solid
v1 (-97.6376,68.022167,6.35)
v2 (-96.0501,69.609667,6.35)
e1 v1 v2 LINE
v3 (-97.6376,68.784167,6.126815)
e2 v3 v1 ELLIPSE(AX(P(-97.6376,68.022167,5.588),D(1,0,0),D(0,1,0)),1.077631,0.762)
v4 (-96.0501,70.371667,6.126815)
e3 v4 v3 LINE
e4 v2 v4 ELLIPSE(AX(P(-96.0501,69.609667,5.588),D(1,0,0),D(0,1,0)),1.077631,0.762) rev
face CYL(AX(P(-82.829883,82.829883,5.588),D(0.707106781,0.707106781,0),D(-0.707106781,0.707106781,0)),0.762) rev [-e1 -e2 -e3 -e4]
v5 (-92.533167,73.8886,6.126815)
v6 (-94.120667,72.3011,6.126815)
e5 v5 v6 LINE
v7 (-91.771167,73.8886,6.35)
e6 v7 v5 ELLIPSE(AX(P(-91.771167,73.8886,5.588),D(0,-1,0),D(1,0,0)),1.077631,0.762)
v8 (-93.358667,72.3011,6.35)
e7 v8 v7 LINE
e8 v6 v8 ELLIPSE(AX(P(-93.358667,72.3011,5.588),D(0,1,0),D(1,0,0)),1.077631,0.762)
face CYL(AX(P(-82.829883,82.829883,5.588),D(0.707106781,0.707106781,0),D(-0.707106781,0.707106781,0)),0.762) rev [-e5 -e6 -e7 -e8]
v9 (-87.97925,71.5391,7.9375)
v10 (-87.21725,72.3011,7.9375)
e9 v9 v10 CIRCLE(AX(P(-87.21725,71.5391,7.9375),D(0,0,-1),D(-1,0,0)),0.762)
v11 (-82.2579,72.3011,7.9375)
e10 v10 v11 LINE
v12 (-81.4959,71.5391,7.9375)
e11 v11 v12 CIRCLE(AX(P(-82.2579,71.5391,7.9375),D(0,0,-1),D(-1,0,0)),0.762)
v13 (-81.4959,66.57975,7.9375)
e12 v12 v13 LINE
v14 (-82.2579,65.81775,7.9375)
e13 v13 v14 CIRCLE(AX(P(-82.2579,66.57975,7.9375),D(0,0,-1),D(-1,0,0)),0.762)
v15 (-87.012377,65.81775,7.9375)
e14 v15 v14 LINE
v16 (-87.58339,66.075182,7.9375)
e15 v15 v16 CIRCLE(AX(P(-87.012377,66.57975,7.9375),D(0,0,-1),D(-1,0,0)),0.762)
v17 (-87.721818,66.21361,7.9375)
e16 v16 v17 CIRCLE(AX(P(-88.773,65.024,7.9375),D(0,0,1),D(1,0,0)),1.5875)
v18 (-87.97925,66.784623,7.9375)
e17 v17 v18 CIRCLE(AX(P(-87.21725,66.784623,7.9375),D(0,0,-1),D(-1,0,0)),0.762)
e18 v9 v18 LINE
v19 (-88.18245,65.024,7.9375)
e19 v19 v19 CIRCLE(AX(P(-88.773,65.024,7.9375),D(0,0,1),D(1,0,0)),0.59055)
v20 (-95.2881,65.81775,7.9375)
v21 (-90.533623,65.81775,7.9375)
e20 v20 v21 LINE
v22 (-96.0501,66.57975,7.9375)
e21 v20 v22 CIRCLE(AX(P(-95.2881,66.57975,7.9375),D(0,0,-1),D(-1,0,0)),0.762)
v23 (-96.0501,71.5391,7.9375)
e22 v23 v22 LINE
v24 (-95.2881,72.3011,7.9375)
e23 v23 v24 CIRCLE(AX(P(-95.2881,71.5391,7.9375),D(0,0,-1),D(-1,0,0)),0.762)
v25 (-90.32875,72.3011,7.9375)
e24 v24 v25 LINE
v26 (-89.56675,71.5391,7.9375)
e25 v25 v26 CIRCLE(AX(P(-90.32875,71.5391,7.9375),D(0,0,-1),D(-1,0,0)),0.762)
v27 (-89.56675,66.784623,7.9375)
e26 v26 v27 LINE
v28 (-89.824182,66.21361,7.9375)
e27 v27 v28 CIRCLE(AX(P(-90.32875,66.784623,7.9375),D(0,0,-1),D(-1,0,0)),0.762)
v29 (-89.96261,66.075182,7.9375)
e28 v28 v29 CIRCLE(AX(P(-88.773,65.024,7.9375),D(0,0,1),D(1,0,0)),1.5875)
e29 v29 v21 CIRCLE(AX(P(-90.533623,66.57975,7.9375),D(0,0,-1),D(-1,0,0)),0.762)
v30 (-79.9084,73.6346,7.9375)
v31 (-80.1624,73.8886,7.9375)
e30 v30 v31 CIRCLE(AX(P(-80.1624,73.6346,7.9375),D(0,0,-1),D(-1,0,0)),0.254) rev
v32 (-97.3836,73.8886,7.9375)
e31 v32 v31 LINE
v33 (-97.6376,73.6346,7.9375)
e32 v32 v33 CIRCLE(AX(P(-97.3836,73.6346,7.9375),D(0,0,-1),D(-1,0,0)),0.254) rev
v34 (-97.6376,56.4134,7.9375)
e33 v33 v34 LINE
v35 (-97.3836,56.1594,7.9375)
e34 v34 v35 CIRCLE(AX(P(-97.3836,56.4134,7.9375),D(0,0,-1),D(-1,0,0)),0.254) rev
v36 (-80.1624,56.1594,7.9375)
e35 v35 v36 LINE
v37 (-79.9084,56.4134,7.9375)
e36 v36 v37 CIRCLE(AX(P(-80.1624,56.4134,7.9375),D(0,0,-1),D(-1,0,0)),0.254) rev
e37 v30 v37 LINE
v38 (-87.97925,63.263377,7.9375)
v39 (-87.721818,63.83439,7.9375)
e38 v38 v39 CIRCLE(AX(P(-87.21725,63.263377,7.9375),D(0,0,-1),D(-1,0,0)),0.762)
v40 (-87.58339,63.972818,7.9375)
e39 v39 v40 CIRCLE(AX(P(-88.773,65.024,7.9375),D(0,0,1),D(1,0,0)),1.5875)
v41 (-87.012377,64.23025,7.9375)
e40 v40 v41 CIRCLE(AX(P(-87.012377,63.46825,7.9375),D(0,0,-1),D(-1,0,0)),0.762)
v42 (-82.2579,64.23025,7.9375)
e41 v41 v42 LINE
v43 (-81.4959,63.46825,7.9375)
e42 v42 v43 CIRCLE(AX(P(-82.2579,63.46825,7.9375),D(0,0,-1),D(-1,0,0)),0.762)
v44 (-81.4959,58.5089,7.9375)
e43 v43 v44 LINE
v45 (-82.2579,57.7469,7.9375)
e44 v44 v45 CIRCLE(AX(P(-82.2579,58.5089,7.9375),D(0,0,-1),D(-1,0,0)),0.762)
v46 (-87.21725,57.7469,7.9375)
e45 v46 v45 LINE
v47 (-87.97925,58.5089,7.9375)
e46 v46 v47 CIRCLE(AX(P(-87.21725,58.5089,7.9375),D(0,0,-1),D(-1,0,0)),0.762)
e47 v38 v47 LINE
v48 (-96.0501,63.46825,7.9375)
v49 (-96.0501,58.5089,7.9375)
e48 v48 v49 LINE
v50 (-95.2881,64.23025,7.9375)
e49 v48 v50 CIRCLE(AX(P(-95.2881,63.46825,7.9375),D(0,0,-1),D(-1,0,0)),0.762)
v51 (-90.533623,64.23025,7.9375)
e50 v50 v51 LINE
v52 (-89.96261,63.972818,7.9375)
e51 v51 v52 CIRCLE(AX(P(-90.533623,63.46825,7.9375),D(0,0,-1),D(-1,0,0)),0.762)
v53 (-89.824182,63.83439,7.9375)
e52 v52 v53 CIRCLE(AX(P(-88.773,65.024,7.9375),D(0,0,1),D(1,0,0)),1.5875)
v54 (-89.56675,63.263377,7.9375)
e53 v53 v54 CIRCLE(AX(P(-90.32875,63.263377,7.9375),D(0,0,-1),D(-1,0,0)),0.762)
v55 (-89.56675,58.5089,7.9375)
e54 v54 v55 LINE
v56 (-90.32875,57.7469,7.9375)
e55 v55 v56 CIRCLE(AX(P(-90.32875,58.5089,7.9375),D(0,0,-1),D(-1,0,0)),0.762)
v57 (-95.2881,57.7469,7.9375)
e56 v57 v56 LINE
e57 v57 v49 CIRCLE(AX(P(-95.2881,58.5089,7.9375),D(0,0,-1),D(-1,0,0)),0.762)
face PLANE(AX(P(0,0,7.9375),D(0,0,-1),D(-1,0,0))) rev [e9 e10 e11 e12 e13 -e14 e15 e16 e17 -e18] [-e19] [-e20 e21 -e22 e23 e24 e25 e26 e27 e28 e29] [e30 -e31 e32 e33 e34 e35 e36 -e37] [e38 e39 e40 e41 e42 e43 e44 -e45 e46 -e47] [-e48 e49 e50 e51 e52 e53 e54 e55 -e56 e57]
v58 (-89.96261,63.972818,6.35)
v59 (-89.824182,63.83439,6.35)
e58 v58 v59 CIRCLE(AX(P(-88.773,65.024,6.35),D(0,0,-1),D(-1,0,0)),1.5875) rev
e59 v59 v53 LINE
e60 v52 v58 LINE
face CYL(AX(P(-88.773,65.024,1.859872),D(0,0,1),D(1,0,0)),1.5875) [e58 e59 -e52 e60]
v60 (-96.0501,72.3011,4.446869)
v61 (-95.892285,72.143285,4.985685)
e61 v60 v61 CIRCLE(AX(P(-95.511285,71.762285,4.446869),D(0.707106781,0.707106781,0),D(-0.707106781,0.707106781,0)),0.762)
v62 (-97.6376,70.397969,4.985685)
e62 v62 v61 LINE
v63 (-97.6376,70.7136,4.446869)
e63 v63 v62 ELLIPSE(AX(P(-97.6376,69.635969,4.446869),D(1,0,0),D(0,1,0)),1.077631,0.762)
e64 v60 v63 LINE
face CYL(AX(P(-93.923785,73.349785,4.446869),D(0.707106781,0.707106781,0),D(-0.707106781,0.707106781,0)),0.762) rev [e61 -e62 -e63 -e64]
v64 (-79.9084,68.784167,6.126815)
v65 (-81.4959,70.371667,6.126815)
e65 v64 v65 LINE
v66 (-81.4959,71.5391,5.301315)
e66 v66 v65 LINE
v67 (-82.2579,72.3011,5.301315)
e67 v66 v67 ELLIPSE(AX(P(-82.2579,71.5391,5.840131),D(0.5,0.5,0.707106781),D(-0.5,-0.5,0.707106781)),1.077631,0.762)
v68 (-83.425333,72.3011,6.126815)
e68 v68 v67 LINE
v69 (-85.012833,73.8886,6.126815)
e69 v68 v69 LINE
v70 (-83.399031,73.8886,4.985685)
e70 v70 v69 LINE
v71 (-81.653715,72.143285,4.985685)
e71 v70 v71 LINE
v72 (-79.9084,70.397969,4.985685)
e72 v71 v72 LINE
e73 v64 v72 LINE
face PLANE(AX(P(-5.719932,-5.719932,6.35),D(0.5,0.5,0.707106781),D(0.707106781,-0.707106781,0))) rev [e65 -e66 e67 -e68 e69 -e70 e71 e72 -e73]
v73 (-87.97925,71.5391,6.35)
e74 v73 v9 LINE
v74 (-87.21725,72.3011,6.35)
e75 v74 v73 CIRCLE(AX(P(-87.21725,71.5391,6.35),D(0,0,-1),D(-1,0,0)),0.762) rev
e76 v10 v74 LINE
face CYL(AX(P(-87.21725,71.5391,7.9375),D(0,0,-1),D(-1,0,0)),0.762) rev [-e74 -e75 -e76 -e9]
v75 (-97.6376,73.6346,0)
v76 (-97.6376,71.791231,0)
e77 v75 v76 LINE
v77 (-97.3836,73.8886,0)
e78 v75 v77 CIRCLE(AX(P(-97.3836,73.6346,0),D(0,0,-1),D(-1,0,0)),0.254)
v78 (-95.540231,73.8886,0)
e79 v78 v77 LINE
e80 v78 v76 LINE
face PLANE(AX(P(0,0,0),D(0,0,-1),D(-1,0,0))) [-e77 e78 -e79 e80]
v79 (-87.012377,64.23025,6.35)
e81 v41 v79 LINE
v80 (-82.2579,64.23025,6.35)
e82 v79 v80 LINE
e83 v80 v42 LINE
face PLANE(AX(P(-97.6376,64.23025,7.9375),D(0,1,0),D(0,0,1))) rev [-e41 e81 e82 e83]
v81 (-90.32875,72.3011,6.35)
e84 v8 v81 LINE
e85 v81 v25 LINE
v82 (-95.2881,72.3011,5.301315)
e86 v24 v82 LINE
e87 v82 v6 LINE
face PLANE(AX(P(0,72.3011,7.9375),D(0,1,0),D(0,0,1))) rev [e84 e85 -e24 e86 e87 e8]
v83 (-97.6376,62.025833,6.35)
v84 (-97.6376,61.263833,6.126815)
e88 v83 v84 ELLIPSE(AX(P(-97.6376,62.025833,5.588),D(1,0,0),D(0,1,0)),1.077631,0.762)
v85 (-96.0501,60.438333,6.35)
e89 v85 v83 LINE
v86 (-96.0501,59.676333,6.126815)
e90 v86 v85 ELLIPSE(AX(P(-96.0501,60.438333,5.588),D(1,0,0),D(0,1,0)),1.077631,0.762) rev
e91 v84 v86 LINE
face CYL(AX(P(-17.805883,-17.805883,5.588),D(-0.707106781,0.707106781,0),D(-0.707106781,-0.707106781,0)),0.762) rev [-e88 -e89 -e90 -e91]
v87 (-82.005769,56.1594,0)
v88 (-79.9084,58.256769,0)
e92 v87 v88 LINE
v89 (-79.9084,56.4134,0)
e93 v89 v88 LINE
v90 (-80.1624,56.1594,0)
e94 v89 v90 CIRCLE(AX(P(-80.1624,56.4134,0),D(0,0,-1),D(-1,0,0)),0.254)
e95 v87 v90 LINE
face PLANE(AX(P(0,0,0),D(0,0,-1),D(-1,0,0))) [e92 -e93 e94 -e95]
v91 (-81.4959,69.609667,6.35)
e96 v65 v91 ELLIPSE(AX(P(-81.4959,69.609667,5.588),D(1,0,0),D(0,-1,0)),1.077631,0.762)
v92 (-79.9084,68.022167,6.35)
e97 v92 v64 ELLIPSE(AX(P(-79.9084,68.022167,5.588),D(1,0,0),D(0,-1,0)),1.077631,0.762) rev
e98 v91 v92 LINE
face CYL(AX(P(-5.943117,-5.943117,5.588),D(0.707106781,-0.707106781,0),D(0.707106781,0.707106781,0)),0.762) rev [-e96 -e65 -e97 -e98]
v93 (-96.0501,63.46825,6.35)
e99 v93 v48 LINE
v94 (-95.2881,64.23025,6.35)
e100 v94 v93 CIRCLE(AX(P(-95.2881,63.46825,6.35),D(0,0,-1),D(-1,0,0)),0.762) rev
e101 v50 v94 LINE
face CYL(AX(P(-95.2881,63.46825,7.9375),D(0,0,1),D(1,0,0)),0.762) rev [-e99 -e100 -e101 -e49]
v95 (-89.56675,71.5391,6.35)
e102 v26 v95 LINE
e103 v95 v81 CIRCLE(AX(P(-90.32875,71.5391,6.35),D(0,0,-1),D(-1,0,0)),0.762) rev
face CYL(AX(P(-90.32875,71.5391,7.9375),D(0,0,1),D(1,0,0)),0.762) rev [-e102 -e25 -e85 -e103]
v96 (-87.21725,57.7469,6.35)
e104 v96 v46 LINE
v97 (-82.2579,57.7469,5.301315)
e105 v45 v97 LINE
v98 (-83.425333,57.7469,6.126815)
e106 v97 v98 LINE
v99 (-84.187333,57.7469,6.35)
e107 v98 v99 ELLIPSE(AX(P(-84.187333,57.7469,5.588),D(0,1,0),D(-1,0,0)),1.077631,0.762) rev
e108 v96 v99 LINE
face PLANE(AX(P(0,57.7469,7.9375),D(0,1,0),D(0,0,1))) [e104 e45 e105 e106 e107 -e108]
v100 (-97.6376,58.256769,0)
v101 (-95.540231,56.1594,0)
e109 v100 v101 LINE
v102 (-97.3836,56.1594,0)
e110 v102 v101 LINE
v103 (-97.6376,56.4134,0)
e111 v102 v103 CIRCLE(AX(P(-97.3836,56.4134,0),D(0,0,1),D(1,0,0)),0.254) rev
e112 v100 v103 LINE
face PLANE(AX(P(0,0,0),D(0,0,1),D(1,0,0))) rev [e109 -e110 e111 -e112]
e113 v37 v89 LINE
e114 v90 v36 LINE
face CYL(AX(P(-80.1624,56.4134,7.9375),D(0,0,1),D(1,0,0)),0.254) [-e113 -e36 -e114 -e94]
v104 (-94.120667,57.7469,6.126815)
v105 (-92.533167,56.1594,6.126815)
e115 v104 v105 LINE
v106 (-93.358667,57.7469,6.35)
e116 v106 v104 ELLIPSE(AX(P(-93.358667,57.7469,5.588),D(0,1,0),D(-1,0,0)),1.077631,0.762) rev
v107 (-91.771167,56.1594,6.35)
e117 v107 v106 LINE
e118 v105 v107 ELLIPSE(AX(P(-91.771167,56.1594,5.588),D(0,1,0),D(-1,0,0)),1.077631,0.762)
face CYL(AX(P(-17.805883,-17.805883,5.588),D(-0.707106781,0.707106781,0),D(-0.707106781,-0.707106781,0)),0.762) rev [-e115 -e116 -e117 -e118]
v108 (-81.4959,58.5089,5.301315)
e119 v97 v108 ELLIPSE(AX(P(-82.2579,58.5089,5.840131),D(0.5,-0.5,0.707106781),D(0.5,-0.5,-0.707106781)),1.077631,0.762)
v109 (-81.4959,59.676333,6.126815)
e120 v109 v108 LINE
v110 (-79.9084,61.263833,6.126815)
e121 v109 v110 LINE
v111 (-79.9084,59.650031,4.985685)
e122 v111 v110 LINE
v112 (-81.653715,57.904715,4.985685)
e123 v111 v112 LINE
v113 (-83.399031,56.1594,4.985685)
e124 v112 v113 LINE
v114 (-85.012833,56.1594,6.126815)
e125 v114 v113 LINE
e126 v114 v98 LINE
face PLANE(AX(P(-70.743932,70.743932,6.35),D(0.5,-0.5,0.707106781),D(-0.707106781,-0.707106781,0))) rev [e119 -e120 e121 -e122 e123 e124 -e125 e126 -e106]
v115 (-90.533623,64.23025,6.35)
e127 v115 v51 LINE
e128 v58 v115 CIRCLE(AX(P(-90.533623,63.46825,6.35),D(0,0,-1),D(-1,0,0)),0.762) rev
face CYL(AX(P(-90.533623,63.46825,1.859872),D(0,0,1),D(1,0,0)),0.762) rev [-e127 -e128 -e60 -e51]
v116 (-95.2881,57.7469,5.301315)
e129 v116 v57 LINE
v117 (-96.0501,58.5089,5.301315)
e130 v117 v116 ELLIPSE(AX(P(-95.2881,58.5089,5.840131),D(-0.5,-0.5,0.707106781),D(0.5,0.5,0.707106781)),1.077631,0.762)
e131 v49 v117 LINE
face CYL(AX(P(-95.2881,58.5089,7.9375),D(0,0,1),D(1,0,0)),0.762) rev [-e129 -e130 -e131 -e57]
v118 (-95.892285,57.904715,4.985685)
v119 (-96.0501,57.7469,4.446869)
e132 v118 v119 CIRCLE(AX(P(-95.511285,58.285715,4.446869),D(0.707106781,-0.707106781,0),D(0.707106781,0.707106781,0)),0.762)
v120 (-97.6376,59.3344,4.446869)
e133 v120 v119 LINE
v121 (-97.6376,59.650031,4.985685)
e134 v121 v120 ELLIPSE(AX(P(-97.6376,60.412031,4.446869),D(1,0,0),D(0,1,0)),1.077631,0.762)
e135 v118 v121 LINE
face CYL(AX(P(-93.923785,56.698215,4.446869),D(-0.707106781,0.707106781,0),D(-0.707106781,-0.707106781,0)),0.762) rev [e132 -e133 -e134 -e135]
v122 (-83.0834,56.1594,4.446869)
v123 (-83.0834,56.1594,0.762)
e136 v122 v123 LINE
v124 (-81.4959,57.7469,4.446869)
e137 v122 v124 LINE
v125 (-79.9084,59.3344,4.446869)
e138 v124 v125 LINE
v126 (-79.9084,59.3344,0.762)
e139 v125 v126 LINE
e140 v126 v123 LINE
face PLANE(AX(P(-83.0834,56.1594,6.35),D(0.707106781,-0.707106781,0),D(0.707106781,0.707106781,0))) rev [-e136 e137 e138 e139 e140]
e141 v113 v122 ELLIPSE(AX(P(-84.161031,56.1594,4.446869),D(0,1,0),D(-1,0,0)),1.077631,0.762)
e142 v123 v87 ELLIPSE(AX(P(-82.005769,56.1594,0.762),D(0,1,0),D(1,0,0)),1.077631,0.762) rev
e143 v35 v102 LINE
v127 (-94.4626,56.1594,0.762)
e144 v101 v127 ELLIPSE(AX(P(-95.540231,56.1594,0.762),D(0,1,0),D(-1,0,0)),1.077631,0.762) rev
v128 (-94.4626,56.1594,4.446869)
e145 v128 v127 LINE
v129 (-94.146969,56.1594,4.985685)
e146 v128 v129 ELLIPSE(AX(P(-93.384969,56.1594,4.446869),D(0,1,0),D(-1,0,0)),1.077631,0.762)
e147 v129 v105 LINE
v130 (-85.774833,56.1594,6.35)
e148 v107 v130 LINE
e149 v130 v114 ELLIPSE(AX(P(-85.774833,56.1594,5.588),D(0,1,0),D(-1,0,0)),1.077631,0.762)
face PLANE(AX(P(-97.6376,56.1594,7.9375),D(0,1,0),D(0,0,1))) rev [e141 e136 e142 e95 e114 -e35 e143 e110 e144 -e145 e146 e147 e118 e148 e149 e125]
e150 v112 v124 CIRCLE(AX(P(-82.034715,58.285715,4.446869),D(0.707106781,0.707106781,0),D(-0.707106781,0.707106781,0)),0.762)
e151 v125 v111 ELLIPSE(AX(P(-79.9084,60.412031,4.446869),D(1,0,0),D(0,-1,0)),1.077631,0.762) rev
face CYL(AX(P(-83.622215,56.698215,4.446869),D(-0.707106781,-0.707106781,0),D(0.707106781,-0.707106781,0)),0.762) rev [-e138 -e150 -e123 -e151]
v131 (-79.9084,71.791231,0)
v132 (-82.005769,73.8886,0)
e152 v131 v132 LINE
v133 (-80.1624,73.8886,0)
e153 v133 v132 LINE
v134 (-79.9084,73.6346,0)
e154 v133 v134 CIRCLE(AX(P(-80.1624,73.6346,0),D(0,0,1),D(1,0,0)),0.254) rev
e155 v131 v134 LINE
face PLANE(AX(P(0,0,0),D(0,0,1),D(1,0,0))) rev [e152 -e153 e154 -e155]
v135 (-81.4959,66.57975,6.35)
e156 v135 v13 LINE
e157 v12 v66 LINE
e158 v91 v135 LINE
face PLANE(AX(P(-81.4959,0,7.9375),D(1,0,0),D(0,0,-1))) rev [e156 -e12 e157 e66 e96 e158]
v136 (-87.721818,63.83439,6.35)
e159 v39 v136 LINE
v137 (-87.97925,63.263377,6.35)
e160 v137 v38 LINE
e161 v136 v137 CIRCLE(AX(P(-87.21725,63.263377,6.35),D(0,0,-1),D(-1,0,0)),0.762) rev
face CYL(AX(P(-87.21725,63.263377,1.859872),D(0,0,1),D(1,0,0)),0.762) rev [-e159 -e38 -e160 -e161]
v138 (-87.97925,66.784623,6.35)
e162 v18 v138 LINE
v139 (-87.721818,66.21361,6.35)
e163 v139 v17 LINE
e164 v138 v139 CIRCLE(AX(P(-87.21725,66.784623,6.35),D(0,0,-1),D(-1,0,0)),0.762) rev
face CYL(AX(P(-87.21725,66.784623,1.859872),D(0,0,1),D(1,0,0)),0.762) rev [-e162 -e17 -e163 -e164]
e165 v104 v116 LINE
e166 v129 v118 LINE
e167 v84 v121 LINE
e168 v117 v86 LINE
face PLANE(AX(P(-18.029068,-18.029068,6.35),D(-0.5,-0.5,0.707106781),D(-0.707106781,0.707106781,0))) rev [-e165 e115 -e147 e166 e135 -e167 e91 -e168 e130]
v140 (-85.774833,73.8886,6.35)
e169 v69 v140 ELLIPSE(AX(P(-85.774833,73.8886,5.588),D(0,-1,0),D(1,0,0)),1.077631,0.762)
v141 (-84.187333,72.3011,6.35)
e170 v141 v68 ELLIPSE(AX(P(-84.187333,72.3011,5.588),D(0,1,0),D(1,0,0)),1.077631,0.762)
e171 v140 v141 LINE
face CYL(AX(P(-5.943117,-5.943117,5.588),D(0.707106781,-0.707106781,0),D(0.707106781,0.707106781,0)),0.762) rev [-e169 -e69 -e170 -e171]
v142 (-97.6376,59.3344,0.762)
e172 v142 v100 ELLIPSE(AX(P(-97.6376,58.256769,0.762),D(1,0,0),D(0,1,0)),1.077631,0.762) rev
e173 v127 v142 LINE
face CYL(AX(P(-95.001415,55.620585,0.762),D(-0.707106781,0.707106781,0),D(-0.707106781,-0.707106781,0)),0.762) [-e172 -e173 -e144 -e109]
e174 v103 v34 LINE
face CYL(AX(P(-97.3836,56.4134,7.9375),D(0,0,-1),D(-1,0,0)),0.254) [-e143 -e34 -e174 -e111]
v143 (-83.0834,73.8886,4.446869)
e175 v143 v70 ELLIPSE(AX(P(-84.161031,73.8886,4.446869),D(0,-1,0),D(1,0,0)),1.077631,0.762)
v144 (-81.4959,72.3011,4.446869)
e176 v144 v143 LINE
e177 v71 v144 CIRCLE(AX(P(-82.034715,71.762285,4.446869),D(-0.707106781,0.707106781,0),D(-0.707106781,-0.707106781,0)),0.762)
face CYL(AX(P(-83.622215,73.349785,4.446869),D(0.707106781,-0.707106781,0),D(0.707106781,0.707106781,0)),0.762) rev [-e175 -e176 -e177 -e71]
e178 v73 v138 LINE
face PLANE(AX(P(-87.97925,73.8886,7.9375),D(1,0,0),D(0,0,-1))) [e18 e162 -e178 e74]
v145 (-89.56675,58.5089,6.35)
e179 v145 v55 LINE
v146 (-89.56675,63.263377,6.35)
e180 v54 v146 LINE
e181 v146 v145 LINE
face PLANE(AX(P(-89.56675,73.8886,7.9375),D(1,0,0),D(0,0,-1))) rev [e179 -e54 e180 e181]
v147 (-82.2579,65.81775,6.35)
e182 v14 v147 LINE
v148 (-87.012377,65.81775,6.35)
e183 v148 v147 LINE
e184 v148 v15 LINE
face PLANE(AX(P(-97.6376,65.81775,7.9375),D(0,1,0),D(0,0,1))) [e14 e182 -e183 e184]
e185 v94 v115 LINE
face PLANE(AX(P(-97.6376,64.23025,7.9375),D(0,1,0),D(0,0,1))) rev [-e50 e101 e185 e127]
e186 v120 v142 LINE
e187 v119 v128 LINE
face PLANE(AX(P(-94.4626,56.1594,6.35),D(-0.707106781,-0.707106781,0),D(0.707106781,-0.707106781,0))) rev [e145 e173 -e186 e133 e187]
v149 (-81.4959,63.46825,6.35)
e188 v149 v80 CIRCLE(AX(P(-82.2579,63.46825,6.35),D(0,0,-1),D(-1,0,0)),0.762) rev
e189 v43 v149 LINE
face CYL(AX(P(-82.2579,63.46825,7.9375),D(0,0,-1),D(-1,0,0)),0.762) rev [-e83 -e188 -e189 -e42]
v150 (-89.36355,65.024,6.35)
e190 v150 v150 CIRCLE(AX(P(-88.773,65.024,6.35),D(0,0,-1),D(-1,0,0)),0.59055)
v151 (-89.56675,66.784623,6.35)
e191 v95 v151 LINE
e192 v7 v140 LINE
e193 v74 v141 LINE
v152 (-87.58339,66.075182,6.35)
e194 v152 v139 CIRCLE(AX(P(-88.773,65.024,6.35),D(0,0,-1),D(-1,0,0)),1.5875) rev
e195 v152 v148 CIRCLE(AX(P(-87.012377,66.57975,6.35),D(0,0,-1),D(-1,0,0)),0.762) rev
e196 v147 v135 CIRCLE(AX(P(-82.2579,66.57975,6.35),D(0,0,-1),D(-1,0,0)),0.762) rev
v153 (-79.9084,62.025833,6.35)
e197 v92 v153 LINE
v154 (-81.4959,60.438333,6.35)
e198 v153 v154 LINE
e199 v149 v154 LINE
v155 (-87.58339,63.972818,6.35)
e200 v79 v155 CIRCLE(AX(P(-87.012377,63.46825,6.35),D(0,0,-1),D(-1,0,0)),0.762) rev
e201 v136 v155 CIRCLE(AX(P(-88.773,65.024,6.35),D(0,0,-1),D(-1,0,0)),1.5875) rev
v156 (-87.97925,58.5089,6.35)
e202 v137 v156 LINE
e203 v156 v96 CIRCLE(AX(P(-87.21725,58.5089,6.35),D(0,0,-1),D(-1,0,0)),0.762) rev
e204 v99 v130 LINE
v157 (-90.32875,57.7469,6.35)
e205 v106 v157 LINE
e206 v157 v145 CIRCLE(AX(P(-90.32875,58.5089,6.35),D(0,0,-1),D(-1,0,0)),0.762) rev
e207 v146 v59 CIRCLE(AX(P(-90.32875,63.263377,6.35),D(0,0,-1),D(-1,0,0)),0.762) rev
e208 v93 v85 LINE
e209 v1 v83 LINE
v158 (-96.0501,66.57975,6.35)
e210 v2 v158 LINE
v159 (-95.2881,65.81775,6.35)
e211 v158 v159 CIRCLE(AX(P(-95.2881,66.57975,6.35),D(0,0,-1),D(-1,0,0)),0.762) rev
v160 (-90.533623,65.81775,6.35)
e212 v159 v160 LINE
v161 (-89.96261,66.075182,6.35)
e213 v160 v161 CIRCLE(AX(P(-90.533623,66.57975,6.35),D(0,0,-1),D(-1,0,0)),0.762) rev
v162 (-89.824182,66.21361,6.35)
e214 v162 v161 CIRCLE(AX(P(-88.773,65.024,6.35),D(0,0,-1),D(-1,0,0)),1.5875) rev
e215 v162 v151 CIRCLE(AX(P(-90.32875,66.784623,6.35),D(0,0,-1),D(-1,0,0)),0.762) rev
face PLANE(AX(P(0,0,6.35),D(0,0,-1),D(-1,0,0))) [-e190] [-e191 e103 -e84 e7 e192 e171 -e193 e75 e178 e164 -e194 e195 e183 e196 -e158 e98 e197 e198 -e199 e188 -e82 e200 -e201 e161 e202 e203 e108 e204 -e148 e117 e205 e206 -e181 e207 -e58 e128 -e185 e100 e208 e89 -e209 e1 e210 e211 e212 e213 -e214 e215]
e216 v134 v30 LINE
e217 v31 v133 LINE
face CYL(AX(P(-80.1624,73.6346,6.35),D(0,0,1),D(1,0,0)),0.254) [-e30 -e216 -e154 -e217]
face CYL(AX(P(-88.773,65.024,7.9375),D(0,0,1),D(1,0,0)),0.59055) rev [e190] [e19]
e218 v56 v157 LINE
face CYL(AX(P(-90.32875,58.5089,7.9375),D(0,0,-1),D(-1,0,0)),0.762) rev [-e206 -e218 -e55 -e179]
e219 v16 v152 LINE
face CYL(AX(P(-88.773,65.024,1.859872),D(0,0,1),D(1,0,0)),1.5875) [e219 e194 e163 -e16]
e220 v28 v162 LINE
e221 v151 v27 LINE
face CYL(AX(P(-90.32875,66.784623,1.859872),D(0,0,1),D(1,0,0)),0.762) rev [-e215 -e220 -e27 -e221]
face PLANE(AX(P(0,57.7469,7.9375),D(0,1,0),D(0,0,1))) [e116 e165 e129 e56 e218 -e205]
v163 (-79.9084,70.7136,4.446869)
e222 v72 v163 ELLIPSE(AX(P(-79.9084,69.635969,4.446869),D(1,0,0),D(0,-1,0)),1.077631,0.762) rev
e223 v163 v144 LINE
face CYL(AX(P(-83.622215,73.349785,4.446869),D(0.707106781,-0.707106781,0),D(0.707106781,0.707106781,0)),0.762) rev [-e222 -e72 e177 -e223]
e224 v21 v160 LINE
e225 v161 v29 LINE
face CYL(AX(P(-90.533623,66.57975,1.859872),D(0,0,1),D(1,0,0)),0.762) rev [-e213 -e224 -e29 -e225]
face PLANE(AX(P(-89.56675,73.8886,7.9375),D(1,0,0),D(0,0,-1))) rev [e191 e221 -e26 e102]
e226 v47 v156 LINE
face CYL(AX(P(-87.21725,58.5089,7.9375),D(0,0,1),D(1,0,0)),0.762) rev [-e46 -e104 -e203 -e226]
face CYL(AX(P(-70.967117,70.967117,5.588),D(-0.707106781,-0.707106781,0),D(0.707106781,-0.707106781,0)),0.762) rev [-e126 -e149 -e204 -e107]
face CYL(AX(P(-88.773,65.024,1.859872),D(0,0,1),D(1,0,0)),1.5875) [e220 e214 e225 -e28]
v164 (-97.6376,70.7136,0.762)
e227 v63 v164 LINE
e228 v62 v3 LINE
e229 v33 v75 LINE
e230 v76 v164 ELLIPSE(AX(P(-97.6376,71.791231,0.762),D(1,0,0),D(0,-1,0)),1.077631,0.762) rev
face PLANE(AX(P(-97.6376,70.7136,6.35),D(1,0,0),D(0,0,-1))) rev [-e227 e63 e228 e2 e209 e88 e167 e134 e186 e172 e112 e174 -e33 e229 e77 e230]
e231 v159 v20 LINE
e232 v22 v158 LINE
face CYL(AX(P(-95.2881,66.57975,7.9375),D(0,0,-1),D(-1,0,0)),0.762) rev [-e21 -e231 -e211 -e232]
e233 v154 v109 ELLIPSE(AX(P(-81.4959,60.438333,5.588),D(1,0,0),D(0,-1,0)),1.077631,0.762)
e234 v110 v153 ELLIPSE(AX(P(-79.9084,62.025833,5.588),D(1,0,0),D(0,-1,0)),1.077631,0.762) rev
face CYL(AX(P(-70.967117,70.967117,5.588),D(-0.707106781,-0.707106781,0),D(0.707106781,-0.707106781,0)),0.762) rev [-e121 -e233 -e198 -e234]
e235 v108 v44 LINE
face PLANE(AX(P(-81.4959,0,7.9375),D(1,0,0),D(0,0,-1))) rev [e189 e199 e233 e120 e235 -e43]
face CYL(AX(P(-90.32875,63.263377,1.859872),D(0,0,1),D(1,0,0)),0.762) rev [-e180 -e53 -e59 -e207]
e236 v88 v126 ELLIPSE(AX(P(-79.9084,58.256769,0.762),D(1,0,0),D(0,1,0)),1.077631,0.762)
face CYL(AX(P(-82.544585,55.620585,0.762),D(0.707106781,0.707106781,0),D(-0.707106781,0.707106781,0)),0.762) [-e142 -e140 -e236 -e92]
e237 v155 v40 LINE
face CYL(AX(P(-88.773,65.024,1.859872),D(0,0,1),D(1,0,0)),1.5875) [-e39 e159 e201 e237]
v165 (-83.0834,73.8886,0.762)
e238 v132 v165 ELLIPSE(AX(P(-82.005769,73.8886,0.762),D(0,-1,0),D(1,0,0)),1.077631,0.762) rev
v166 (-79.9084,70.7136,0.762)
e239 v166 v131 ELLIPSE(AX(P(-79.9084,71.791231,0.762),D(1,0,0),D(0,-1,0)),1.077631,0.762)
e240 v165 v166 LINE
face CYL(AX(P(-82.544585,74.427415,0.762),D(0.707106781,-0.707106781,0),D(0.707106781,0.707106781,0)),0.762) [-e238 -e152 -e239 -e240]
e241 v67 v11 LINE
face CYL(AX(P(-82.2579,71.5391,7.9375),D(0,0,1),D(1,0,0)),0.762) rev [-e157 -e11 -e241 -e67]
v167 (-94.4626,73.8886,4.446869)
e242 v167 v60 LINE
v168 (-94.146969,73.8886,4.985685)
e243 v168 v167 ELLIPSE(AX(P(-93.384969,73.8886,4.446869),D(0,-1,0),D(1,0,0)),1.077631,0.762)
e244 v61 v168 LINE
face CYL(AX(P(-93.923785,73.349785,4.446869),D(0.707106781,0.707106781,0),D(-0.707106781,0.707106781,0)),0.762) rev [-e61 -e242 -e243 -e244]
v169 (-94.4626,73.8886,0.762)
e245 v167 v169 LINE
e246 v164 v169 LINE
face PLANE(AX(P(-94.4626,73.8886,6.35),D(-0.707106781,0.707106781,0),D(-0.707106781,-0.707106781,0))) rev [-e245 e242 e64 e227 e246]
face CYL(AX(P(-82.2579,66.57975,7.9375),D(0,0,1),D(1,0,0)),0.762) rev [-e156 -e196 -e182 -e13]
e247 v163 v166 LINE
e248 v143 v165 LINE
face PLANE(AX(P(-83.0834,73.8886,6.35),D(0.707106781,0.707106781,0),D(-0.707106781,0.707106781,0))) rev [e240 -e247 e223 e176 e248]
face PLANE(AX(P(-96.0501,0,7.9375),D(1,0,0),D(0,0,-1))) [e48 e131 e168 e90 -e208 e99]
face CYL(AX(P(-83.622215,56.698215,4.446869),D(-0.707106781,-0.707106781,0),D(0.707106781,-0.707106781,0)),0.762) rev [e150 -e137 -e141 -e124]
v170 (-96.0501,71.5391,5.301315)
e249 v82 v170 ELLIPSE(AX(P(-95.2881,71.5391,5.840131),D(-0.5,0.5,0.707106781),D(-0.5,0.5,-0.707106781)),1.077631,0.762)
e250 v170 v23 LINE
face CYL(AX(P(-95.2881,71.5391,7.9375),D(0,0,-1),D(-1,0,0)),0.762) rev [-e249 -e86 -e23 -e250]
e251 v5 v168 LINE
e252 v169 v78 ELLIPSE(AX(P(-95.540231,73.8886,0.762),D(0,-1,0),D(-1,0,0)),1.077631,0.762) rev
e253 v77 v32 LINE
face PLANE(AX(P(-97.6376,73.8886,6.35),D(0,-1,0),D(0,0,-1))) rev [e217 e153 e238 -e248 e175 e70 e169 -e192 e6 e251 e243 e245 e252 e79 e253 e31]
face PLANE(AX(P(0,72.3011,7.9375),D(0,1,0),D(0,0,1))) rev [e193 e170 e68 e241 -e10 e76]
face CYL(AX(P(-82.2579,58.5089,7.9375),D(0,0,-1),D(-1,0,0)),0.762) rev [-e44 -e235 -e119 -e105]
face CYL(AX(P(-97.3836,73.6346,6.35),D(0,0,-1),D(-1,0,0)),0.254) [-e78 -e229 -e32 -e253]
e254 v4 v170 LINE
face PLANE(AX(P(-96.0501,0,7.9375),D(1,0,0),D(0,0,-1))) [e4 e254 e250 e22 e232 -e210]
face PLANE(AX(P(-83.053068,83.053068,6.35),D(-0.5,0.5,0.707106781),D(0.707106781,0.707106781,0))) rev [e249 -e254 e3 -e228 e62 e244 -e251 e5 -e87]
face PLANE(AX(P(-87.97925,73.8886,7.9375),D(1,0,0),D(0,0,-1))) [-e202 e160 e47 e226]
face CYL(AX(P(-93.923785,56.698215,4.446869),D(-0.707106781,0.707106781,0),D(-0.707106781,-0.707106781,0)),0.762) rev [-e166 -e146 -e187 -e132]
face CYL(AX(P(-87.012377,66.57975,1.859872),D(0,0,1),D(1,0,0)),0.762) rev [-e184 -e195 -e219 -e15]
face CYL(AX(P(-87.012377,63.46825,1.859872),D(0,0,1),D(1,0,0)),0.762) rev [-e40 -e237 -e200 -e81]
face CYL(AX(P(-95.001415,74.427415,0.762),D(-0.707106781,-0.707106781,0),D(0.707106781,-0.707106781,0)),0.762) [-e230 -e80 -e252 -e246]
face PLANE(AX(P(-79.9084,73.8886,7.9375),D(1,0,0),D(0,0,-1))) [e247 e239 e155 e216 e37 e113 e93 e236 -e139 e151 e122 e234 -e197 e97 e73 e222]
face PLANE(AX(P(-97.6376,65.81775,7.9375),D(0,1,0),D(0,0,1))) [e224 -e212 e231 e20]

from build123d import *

# Parameters (mm, degrees)
BOSS_EXTRUDE1_DEPTH          = 6.35
BOSS_EXTRUDE1_2_DEPTH        = 6.35
BOSS_EXTRUDE1_3_DEPTH        = 6.35
BOSS_EXTRUDE1_4_DEPTH        = 6.35
EXTRUDE_THIN1_DEPTH          = 1.5875
SKETCH2_3_W                  = 17.7292
SKETCH2_3_H                  = 17.7292
SKETCH2_3_W_2                = 14.5542
SKETCH2_3_H_2                = 14.5542
EXTRUDE_THIN2_DEPTH          = 1.5875
SKETCH6_R                    = 1.5875
BOSS_EXTRUDE3_DEPTH          = 1.5875
F_56_0_0465_DIAMETER_HOLE1_D = 1.1811
CHAMFER1_SIZE                = 1.5875
FILLET2_R                    = 0.762
FILLET3_R                    = 0.762
FILLET4_R                    = 0.254


# Read off the part's stored shape, not the designer's step: Extrude-Thin1
with BuildPart() as part:
    # Sketch1 → Boss-Extrude1 (new body)
    with BuildSketch(Plane.XY):
        Polygon((-97.6376, 73.8886), (-94.4626, 73.8886), (-97.6376, 70.7136), align=None)
    extrude(amount=BOSS_EXTRUDE1_DEPTH)



with BuildPart() as body_2:
    # Sketch1 → Boss-Extrude1 2 (new body)
    with BuildSketch(Plane.XY):
        Polygon((-79.9084, 70.7136), (-79.9084, 73.8886), (-83.0834, 73.8886), align=None)
    extrude(amount=BOSS_EXTRUDE1_2_DEPTH)


with BuildPart() as body_3:
    # Sketch1 → Boss-Extrude1 3 (new body)
    with BuildSketch(Plane.XY):
        Polygon((-79.9084, 56.1594), (-83.0834, 56.1594), (-79.9084, 59.3344), align=None)
    extrude(amount=BOSS_EXTRUDE1_3_DEPTH)


with BuildPart() as body_4:
    # Sketch1 → Boss-Extrude1 4 (new body)
    with BuildSketch(Plane.XY):
        Polygon((-97.6376, 59.3344), (-97.6376, 56.1594), (-94.4626, 56.1594), align=None)
    extrude(amount=BOSS_EXTRUDE1_4_DEPTH)


with BuildPart() as body_5:
    # Extrude-Thin1 outline → Extrude-Thin1 (new body)
    with BuildSketch(Plane.XY.offset(6.35)):
        Polygon((-89.56675, 65.81775), (-97.6376, 65.81775), (-97.6376, 64.23025), (-89.56675, 64.23025), (-89.56675, 56.1594), (-87.97925, 56.1594), (-87.97925, 64.23025), (-79.9084, 64.23025), (-79.9084, 65.81775), (-87.97925, 65.81775), (-87.97925, 73.8886), (-89.56675, 73.8886), align=None)
    extrude(amount=EXTRUDE_THIN1_DEPTH)


with BuildPart() as part_1:
    add(part.part)

    add(body_2.part)  # Extrude-Thin2 merges body 2

    add(body_3.part)  # Extrude-Thin2 merges body 3

    add(body_4.part)  # Extrude-Thin2 merges body 4

    add(body_5.part)  # Extrude-Thin2 merges body 5
    # Sketch2<3> → Extrude-Thin2 (add)
    with BuildSketch(Plane.XY.offset(6.35)):
        with Locations((-88.773, 65.024)):
            Rectangle(SKETCH2_3_W, SKETCH2_3_H)
        with Locations((-88.773, 65.024)):
            Rectangle(SKETCH2_3_W_2, SKETCH2_3_H_2, mode=Mode.SUBTRACT)
    extrude(amount=EXTRUDE_THIN2_DEPTH)

    # Sketch6 → Boss-Extrude3 (add)
    with BuildSketch(Plane.XY.offset(7.9375)):
        with Locations((-88.773, 65.024)):
            Circle(SKETCH6_R)
    extrude(amount=-BOSS_EXTRUDE3_DEPTH)

    # #56 (0.0465) Diameter Hole1 (through all)
    with Locations(Plane.XY.offset(7.9375)):
        with Locations((-88.773, 65.024)):
            Hole(F_56_0_0465_DIAMETER_HOLE1_D / 2)

    # Chamfer1
    # the kernel refuses this chamfer: 1.5875 mm, written as the material it adds along each edge
    with BuildSketch(Plane(origin=(-85.970196487, 53.272603513, 6.35), x_dir=(-0.7068394360706735, 0.7068394360706735, 0.02749587661058616), z_dir=(0.7071067811865476, 0.7071067811865476, 0))) as chamfer1_piece_1_section:
        Polygon((CHAMFER1_SIZE * 0.999621916911, -CHAMFER1_SIZE * 0.0274958766106), (-CHAMFER1_SIZE * 0.0274958766106, -CHAMFER1_SIZE * 0.999621916911), (0, 0), align=None)
    chamfer1_piece_1 = extrude(amount=6.327610774, mode=Mode.PRIVATE)
    chamfer1_piece_1 = split(chamfer1_piece_1, bisect_by=Plane(origin=(-83.03148044, 56.1594, 5.826998953), z_dir=(0, 1, 0)), keep=Keep.TOP, mode=Mode.PRIVATE)
    chamfer1_piece_1 = split(chamfer1_piece_1, bisect_by=Plane(origin=(-83.03148044, 57.7469, 5.826998953), z_dir=(0, -1, 0)), keep=Keep.TOP, mode=Mode.PRIVATE)
    add(chamfer1_piece_1)
    with BuildSketch(Plane(origin=(-81.4959, 57.7469, 6.35), x_dir=(-0.7068394360706735, 0.7068394360706735, 0.02749587661058616), z_dir=(0.7071067811865476, 0.7071067811865476, 0))) as chamfer1_piece_2_section:
        Polygon((CHAMFER1_SIZE * 0.999621916911, -CHAMFER1_SIZE * 0.0274958766106), (-CHAMFER1_SIZE * 0.0274958766106, -CHAMFER1_SIZE * 0.999621916911), (0, 0), align=None)
    chamfer1_piece_2 = extrude(amount=6.327610774, mode=Mode.PRIVATE)
    chamfer1_piece_2 = split(chamfer1_piece_2, bisect_by=Plane(origin=(-79.9084, 59.28248044, 5.826998953), z_dir=(-1, 0, 0)), keep=Keep.TOP, mode=Mode.PRIVATE)
    chamfer1_piece_2 = split(chamfer1_piece_2, bisect_by=Plane(origin=(-81.4959, 59.28248044, 5.826998953), z_dir=(1, 0, 0)), keep=Keep.TOP, mode=Mode.PRIVATE)
    add(chamfer1_piece_2)
    with BuildSketch(Plane(origin=(-81.4959, 72.3011, 6.35), x_dir=(0.01944252080601567, 0.01944252080601567, -0.9996219169112966), z_dir=(0.7071067811865476, -0.7071067811865476, 0))) as chamfer1_piece_3_section:
        Polygon((CHAMFER1_SIZE * 0.999621916911, -CHAMFER1_SIZE * 0.0274958766106), (-CHAMFER1_SIZE * 0.0274958766106, -CHAMFER1_SIZE * 0.999621916911), (0, 0), align=None)
    chamfer1_piece_3 = extrude(amount=6.327610774, mode=Mode.PRIVATE)
    chamfer1_piece_3 = split(chamfer1_piece_3, bisect_by=Plane(origin=(-79.9084, 72.313041711, 5.228115698), z_dir=(-1, 0, 0)), keep=Keep.TOP, mode=Mode.PRIVATE)
    chamfer1_piece_3 = split(chamfer1_piece_3, bisect_by=Plane(origin=(-81.4959, 72.313041711, 5.228115698), z_dir=(1, 0, 0)), keep=Keep.TOP, mode=Mode.PRIVATE)
    add(chamfer1_piece_3)
    with BuildSketch(Plane(origin=(-85.970196487, 76.775396487, 6.35), x_dir=(0.01944252080601567, 0.01944252080601567, -0.9996219169112966), z_dir=(0.7071067811865476, -0.7071067811865476, 0))) as chamfer1_piece_4_section:
        Polygon((CHAMFER1_SIZE * 0.999621916911, -CHAMFER1_SIZE * 0.0274958766106), (-CHAMFER1_SIZE * 0.0274958766106, -CHAMFER1_SIZE * 0.999621916911), (0, 0), align=None)
    chamfer1_piece_4 = extrude(amount=6.327610774, mode=Mode.PRIVATE)
    chamfer1_piece_4 = split(chamfer1_piece_4, bisect_by=Plane(origin=(-83.03148044, 73.8886, 5.826998953), z_dir=(0, -1, 0)), keep=Keep.TOP, mode=Mode.PRIVATE)
    chamfer1_piece_4 = split(chamfer1_piece_4, bisect_by=Plane(origin=(-83.03148044, 72.3011, 5.826998953), z_dir=(0, 1, 0)), keep=Keep.TOP, mode=Mode.PRIVATE)
    add(chamfer1_piece_4)
    with BuildSketch(Plane(origin=(-91.575803513, 76.775396487, 6.35), x_dir=(0.7068394360706735, -0.7068394360706735, 0.02749587661058616), z_dir=(-0.7071067811865476, -0.7071067811865476, 0))) as chamfer1_piece_5_section:
        Polygon((CHAMFER1_SIZE * 0.999621916911, -CHAMFER1_SIZE * 0.0274958766106), (-CHAMFER1_SIZE * 0.0274958766106, -CHAMFER1_SIZE * 0.999621916911), (0, 0), align=None)
    chamfer1_piece_5 = extrude(amount=6.327610774, mode=Mode.PRIVATE)
    chamfer1_piece_5 = split(chamfer1_piece_5, bisect_by=Plane(origin=(-94.51451956, 73.8886, 5.826998953), z_dir=(0, -1, 0)), keep=Keep.TOP, mode=Mode.PRIVATE)
    chamfer1_piece_5 = split(chamfer1_piece_5, bisect_by=Plane(origin=(-94.51451956, 72.3011, 5.826998953), z_dir=(0, 1, 0)), keep=Keep.TOP, mode=Mode.PRIVATE)
    add(chamfer1_piece_5)
    with BuildSketch(Plane(origin=(-96.0501, 72.3011, 6.35), x_dir=(0.7068394360706735, -0.7068394360706735, 0.02749587661058616), z_dir=(-0.7071067811865476, -0.7071067811865476, 0))) as chamfer1_piece_6_section:
        Polygon((CHAMFER1_SIZE * 0.999621916911, -CHAMFER1_SIZE * 0.0274958766106), (-CHAMFER1_SIZE * 0.0274958766106, -CHAMFER1_SIZE * 0.999621916911), (0, 0), align=None)
    chamfer1_piece_6 = extrude(amount=6.327610774, mode=Mode.PRIVATE)
    chamfer1_piece_6 = split(chamfer1_piece_6, bisect_by=Plane(origin=(-97.6376, 70.76551956, 5.826998953), z_dir=(1, 0, 0)), keep=Keep.TOP, mode=Mode.PRIVATE)
    chamfer1_piece_6 = split(chamfer1_piece_6, bisect_by=Plane(origin=(-96.0501, 70.76551956, 5.826998953), z_dir=(-1, 0, 0)), keep=Keep.TOP, mode=Mode.PRIVATE)
    add(chamfer1_piece_6)
    with BuildSketch(Plane(origin=(-91.575803513, 53.272603513, 6.35), x_dir=(0.7068394360706735, 0.7068394360706735, 0.027495876610586705), z_dir=(-0.7071067811865476, 0.7071067811865476, 0))) as chamfer1_piece_7_section:
        Polygon((CHAMFER1_SIZE * 0.999621916911, CHAMFER1_SIZE * 0.0274958766106), (-CHAMFER1_SIZE * 0.0274958766106, CHAMFER1_SIZE * 0.999621916911), (0, 0), align=None)
    chamfer1_piece_7 = extrude(amount=6.327610774, mode=Mode.PRIVATE)
    chamfer1_piece_7 = split(chamfer1_piece_7, bisect_by=Plane(origin=(-94.51451956, 56.1594, 5.826998953), z_dir=(0, 1, 0)), keep=Keep.TOP, mode=Mode.PRIVATE)
    chamfer1_piece_7 = split(chamfer1_piece_7, bisect_by=Plane(origin=(-94.51451956, 57.7469, 5.826998953), z_dir=(0, -1, 0)), keep=Keep.TOP, mode=Mode.PRIVATE)
    add(chamfer1_piece_7)
    with BuildSketch(Plane(origin=(-96.0501, 57.7469, 6.35), x_dir=(0.7068394360706735, 0.7068394360706735, 0.02749587661058616), z_dir=(-0.7071067811865476, 0.7071067811865476, 0))) as chamfer1_piece_8_section:
        Polygon((CHAMFER1_SIZE * 0.999621916911, CHAMFER1_SIZE * 0.0274958766106), (-CHAMFER1_SIZE * 0.0274958766106, CHAMFER1_SIZE * 0.999621916911), (0, 0), align=None)
    chamfer1_piece_8 = extrude(amount=6.327610774, mode=Mode.PRIVATE)
    chamfer1_piece_8 = split(chamfer1_piece_8, bisect_by=Plane(origin=(-97.6376, 59.28248044, 5.826998953), z_dir=(1, 0, 0)), keep=Keep.TOP, mode=Mode.PRIVATE)
    chamfer1_piece_8 = split(chamfer1_piece_8, bisect_by=Plane(origin=(-96.0501, 59.28248044, 5.826998953), z_dir=(-1, 0, 0)), keep=Keep.TOP, mode=Mode.PRIVATE)
    add(chamfer1_piece_8)

    # Fillet2
    # the kernel refuses this fillet: 0.762 mm, written as the material it adds along each edge
    with BuildSketch(Plane(origin=(-90.147815329, 64.23025, 6.35), x_dir=(-1, 0, 0), z_dir=(0, 0, 1)), Plane(origin=(-89.56675, 66.398815329, 6.35), x_dir=(0, 1, 0), z_dir=(0, 0, 1)), Plane(origin=(-87.97925, 63.649184671, 6.35), x_dir=(0, -1, 0), z_dir=(0, 0, 1)), Plane(origin=(-87.398184671, 65.81775, 6.35), x_dir=(1, 0, 0), z_dir=(0, 0, 1))) as fillet2_piece_1:
        with BuildLine():
            CenterArc((0.385807342, 0.762), FILLET2_R, 221.464980775, 48.535019225)
            ThreePointArc((-0.185205416, 0.257432432), (-0.086158249, 0.133352573), (0, 0))
            Line((0, 0), (0.385807342, 0))
        make_face()
    extrude(amount=1.5875)
    with BuildSketch(Plane(origin=(-90.147815329, 65.81775, 6.35), x_dir=(0.5840016210353491, 0.8117524909897625, 0), z_dir=(0, 0, 1)), Plane(origin=(-87.398184671, 64.23025, 6.35), x_dir=(-0.5840016210353066, -0.8117524909897931, 0), z_dir=(0, 0, 1)), Plane(origin=(-89.56675, 63.649184671, 6.35), x_dir=(-0.8117524909898051, 0.5840016210352901, 0), z_dir=(0, 0, 1)), Plane(origin=(-87.97925, 66.398815329, 6.35), x_dir=(0.811752490989754, -0.584001621035361, 0), z_dir=(0, 0, 1))) as fillet2_piece_2:
        with BuildLine():
            CenterArc((0.393243285, 0.758189306), FILLET2_R, 215.732490387, 48.535019225)
            Line((-0.225312113, 0.313180071), (0, 0))
            ThreePointArc((0, 0), (0.158565841, 0.007938946), (0.317131681, 0))
        make_face()
    extrude(amount=1.5875)
    with BuildSketch(Plane(origin=(-96.0501, 72.3011, 2.8575), x_dir=(1, 0, 0), z_dir=(0, 0, 1))) as fillet2_piece_3_section:
        with BuildLine():
            CenterArc((FILLET2_R, -FILLET2_R), FILLET2_R, 90, 90)
            Line((0, -FILLET2_R), (0, 0))
            Line((0, 0), (FILLET2_R, 0))
        make_face()
    fillet2_piece_3 = extrude(amount=5.08, mode=Mode.PRIVATE)
    fillet2_piece_3 = split(fillet2_piece_3, bisect_by=Plane(origin=(-95.361447412, 71.612447412, 5.73640183), z_dir=(-0.5000000000001895, 0.5000000000001895, 0.7071067811862797)), keep=Keep.TOP, mode=Mode.PRIVATE)
    add(fillet2_piece_3)
    with BuildSketch(Plane(origin=(-96.0501, 57.7469, 7.9375), x_dir=(0, 1, 0), z_dir=(0, 0, -1))) as fillet2_piece_4_section:
        with BuildLine():
            CenterArc((FILLET2_R, FILLET2_R), FILLET2_R, 180, 90)
            Line((0, FILLET2_R), (0, 0))
            Line((0, 0), (FILLET2_R, 0))
        make_face()
    fillet2_piece_4 = extrude(amount=5.08, mode=Mode.PRIVATE)
    fillet2_piece_4 = split(fillet2_piece_4, bisect_by=Plane(origin=(-95.361447412, 58.435552588, 5.73640183), z_dir=(-0.5000000000001895, -0.5000000000001895, 0.7071067811862797)), keep=Keep.TOP, mode=Mode.PRIVATE)
    add(fillet2_piece_4)
    with BuildSketch(Plane(origin=(-81.4959, 57.7469, 2.8575), x_dir=(-1, 0, 0), z_dir=(0, 0, 1))) as fillet2_piece_5_section:
        with BuildLine():
            CenterArc((FILLET2_R, -FILLET2_R), FILLET2_R, 90, 90)
            Line((0, -FILLET2_R), (0, 0))
            Line((0, 0), (FILLET2_R, 0))
        make_face()
    fillet2_piece_5 = extrude(amount=5.08, mode=Mode.PRIVATE)
    fillet2_piece_5 = split(fillet2_piece_5, bisect_by=Plane(origin=(-82.184552588, 58.435552588, 5.73640183), z_dir=(0.5000000000001895, -0.5000000000001895, 0.7071067811862797)), keep=Keep.TOP, mode=Mode.PRIVATE)
    add(fillet2_piece_5)
    with BuildSketch(Plane(origin=(-81.4959, 72.3011, 2.8575), x_dir=(0, -1, 0), z_dir=(0, 0, 1))) as fillet2_piece_6_section:
        with BuildLine():
            CenterArc((FILLET2_R, -FILLET2_R), FILLET2_R, 90, 90)
            Line((0, -FILLET2_R), (0, 0))
            Line((0, 0), (FILLET2_R, 0))
        make_face()
    fillet2_piece_6 = extrude(amount=5.08, mode=Mode.PRIVATE)
    fillet2_piece_6 = split(fillet2_piece_6, bisect_by=Plane(origin=(-82.184552588, 71.612447412, 5.73640183), z_dir=(0.500000000000017, 0.500000000000017, 0.7071067811865237)), keep=Keep.TOP, mode=Mode.PRIVATE)
    add(fillet2_piece_6)
    with BuildSketch(Plane(origin=(-81.4959, 64.23025, 7.9375), x_dir=(0, -1, 0), z_dir=(0, 0, -1)), Plane(origin=(-81.4959, 65.81775, 6.35), x_dir=(0, 1, 0), z_dir=(0, 0, 1)), Plane(origin=(-87.97925, 57.7469, 6.35), x_dir=(1, 0, 0), z_dir=(0, 0, 1)), Plane(origin=(-96.0501, 64.23025, 6.35), x_dir=(0, -1, 0), z_dir=(0, 0, 1)), Plane(origin=(-87.97925, 72.3011, 7.9375), x_dir=(1, 0, 0), z_dir=(0, 0, -1))) as fillet2_piece_7:
        with BuildLine():
            CenterArc((FILLET2_R, FILLET2_R), FILLET2_R, 180, 90)
            Line((0, FILLET2_R), (0, 0))
            Line((0, 0), (FILLET2_R, 0))
        make_face()
    extrude(amount=1.5875)
    with BuildSketch(Plane(origin=(-89.56675, 57.7469, 7.9375), x_dir=(0, 1, 0), z_dir=(0, 0, -1)), Plane(origin=(-96.0501, 65.81775, 7.9375), x_dir=(1, 0, 0), z_dir=(0, 0, -1)), Plane(origin=(-89.56675, 72.3011, 6.35), x_dir=(0, -1, 0), z_dir=(0, 0, 1))) as fillet2_piece_8:
        with BuildLine():
            CenterArc((FILLET2_R, -FILLET2_R), FILLET2_R, 90, 90)
            Line((0, -FILLET2_R), (0, 0))
            Line((0, 0), (FILLET2_R, 0))
        make_face()
    extrude(amount=1.5875)

    # Fillet3
    fillet3_edges = [part_1.edges().sort_by_distance(p)[0] for p in [
        (-96.84385, 60.78571403, 6.35),
        (-93.01128597, 56.95315, 6.35),
        (-96.84385, 69.26228597, 6.35),
        (-93.01128597, 73.09485, 6.35),
        (-84.53471403, 73.09485, 6.35),
        (-80.70215, 69.26228597, 6.35),
        (-80.70215, 60.78571403, 6.35),
        (-84.53471403, 56.95315, 6.35),
        (-81.4959, 57.7469, 4.7625),
        (-81.4959, 57.7469, 4.7625),
        (-81.4959, 72.3011, 4.7625),
        (-81.4959, 72.3011, 4.7625),
        (-96.0501, 72.3011, 4.7625),
        (-96.0501, 72.3011, 4.7625),
        (-96.0501, 57.7469, 4.7625),
        (-96.0501, 57.7469, 4.7625),
        (-81.4959, 72.3011, 0),
        (-81.4959, 57.7469, 0),
        (-96.0501, 72.3011, 0),
        (-96.0501, 57.7469, 0),
    ]]
    fillet(fillet3_edges, radius=FILLET3_R)

    # Fillet4
    fillet4_edges = [part_1.edges().sort_by_distance(p)[0] for p in [
        (-79.9084, 73.8886, 3.96875),
        (-97.6376, 56.1594, 3.96875),
        (-79.9084, 56.1594, 3.96875),
        (-97.6376, 73.8886, 3.96875),
    ]]
    fillet(fillet4_edges, radius=FILLET4_R)


solid = part_1.part
